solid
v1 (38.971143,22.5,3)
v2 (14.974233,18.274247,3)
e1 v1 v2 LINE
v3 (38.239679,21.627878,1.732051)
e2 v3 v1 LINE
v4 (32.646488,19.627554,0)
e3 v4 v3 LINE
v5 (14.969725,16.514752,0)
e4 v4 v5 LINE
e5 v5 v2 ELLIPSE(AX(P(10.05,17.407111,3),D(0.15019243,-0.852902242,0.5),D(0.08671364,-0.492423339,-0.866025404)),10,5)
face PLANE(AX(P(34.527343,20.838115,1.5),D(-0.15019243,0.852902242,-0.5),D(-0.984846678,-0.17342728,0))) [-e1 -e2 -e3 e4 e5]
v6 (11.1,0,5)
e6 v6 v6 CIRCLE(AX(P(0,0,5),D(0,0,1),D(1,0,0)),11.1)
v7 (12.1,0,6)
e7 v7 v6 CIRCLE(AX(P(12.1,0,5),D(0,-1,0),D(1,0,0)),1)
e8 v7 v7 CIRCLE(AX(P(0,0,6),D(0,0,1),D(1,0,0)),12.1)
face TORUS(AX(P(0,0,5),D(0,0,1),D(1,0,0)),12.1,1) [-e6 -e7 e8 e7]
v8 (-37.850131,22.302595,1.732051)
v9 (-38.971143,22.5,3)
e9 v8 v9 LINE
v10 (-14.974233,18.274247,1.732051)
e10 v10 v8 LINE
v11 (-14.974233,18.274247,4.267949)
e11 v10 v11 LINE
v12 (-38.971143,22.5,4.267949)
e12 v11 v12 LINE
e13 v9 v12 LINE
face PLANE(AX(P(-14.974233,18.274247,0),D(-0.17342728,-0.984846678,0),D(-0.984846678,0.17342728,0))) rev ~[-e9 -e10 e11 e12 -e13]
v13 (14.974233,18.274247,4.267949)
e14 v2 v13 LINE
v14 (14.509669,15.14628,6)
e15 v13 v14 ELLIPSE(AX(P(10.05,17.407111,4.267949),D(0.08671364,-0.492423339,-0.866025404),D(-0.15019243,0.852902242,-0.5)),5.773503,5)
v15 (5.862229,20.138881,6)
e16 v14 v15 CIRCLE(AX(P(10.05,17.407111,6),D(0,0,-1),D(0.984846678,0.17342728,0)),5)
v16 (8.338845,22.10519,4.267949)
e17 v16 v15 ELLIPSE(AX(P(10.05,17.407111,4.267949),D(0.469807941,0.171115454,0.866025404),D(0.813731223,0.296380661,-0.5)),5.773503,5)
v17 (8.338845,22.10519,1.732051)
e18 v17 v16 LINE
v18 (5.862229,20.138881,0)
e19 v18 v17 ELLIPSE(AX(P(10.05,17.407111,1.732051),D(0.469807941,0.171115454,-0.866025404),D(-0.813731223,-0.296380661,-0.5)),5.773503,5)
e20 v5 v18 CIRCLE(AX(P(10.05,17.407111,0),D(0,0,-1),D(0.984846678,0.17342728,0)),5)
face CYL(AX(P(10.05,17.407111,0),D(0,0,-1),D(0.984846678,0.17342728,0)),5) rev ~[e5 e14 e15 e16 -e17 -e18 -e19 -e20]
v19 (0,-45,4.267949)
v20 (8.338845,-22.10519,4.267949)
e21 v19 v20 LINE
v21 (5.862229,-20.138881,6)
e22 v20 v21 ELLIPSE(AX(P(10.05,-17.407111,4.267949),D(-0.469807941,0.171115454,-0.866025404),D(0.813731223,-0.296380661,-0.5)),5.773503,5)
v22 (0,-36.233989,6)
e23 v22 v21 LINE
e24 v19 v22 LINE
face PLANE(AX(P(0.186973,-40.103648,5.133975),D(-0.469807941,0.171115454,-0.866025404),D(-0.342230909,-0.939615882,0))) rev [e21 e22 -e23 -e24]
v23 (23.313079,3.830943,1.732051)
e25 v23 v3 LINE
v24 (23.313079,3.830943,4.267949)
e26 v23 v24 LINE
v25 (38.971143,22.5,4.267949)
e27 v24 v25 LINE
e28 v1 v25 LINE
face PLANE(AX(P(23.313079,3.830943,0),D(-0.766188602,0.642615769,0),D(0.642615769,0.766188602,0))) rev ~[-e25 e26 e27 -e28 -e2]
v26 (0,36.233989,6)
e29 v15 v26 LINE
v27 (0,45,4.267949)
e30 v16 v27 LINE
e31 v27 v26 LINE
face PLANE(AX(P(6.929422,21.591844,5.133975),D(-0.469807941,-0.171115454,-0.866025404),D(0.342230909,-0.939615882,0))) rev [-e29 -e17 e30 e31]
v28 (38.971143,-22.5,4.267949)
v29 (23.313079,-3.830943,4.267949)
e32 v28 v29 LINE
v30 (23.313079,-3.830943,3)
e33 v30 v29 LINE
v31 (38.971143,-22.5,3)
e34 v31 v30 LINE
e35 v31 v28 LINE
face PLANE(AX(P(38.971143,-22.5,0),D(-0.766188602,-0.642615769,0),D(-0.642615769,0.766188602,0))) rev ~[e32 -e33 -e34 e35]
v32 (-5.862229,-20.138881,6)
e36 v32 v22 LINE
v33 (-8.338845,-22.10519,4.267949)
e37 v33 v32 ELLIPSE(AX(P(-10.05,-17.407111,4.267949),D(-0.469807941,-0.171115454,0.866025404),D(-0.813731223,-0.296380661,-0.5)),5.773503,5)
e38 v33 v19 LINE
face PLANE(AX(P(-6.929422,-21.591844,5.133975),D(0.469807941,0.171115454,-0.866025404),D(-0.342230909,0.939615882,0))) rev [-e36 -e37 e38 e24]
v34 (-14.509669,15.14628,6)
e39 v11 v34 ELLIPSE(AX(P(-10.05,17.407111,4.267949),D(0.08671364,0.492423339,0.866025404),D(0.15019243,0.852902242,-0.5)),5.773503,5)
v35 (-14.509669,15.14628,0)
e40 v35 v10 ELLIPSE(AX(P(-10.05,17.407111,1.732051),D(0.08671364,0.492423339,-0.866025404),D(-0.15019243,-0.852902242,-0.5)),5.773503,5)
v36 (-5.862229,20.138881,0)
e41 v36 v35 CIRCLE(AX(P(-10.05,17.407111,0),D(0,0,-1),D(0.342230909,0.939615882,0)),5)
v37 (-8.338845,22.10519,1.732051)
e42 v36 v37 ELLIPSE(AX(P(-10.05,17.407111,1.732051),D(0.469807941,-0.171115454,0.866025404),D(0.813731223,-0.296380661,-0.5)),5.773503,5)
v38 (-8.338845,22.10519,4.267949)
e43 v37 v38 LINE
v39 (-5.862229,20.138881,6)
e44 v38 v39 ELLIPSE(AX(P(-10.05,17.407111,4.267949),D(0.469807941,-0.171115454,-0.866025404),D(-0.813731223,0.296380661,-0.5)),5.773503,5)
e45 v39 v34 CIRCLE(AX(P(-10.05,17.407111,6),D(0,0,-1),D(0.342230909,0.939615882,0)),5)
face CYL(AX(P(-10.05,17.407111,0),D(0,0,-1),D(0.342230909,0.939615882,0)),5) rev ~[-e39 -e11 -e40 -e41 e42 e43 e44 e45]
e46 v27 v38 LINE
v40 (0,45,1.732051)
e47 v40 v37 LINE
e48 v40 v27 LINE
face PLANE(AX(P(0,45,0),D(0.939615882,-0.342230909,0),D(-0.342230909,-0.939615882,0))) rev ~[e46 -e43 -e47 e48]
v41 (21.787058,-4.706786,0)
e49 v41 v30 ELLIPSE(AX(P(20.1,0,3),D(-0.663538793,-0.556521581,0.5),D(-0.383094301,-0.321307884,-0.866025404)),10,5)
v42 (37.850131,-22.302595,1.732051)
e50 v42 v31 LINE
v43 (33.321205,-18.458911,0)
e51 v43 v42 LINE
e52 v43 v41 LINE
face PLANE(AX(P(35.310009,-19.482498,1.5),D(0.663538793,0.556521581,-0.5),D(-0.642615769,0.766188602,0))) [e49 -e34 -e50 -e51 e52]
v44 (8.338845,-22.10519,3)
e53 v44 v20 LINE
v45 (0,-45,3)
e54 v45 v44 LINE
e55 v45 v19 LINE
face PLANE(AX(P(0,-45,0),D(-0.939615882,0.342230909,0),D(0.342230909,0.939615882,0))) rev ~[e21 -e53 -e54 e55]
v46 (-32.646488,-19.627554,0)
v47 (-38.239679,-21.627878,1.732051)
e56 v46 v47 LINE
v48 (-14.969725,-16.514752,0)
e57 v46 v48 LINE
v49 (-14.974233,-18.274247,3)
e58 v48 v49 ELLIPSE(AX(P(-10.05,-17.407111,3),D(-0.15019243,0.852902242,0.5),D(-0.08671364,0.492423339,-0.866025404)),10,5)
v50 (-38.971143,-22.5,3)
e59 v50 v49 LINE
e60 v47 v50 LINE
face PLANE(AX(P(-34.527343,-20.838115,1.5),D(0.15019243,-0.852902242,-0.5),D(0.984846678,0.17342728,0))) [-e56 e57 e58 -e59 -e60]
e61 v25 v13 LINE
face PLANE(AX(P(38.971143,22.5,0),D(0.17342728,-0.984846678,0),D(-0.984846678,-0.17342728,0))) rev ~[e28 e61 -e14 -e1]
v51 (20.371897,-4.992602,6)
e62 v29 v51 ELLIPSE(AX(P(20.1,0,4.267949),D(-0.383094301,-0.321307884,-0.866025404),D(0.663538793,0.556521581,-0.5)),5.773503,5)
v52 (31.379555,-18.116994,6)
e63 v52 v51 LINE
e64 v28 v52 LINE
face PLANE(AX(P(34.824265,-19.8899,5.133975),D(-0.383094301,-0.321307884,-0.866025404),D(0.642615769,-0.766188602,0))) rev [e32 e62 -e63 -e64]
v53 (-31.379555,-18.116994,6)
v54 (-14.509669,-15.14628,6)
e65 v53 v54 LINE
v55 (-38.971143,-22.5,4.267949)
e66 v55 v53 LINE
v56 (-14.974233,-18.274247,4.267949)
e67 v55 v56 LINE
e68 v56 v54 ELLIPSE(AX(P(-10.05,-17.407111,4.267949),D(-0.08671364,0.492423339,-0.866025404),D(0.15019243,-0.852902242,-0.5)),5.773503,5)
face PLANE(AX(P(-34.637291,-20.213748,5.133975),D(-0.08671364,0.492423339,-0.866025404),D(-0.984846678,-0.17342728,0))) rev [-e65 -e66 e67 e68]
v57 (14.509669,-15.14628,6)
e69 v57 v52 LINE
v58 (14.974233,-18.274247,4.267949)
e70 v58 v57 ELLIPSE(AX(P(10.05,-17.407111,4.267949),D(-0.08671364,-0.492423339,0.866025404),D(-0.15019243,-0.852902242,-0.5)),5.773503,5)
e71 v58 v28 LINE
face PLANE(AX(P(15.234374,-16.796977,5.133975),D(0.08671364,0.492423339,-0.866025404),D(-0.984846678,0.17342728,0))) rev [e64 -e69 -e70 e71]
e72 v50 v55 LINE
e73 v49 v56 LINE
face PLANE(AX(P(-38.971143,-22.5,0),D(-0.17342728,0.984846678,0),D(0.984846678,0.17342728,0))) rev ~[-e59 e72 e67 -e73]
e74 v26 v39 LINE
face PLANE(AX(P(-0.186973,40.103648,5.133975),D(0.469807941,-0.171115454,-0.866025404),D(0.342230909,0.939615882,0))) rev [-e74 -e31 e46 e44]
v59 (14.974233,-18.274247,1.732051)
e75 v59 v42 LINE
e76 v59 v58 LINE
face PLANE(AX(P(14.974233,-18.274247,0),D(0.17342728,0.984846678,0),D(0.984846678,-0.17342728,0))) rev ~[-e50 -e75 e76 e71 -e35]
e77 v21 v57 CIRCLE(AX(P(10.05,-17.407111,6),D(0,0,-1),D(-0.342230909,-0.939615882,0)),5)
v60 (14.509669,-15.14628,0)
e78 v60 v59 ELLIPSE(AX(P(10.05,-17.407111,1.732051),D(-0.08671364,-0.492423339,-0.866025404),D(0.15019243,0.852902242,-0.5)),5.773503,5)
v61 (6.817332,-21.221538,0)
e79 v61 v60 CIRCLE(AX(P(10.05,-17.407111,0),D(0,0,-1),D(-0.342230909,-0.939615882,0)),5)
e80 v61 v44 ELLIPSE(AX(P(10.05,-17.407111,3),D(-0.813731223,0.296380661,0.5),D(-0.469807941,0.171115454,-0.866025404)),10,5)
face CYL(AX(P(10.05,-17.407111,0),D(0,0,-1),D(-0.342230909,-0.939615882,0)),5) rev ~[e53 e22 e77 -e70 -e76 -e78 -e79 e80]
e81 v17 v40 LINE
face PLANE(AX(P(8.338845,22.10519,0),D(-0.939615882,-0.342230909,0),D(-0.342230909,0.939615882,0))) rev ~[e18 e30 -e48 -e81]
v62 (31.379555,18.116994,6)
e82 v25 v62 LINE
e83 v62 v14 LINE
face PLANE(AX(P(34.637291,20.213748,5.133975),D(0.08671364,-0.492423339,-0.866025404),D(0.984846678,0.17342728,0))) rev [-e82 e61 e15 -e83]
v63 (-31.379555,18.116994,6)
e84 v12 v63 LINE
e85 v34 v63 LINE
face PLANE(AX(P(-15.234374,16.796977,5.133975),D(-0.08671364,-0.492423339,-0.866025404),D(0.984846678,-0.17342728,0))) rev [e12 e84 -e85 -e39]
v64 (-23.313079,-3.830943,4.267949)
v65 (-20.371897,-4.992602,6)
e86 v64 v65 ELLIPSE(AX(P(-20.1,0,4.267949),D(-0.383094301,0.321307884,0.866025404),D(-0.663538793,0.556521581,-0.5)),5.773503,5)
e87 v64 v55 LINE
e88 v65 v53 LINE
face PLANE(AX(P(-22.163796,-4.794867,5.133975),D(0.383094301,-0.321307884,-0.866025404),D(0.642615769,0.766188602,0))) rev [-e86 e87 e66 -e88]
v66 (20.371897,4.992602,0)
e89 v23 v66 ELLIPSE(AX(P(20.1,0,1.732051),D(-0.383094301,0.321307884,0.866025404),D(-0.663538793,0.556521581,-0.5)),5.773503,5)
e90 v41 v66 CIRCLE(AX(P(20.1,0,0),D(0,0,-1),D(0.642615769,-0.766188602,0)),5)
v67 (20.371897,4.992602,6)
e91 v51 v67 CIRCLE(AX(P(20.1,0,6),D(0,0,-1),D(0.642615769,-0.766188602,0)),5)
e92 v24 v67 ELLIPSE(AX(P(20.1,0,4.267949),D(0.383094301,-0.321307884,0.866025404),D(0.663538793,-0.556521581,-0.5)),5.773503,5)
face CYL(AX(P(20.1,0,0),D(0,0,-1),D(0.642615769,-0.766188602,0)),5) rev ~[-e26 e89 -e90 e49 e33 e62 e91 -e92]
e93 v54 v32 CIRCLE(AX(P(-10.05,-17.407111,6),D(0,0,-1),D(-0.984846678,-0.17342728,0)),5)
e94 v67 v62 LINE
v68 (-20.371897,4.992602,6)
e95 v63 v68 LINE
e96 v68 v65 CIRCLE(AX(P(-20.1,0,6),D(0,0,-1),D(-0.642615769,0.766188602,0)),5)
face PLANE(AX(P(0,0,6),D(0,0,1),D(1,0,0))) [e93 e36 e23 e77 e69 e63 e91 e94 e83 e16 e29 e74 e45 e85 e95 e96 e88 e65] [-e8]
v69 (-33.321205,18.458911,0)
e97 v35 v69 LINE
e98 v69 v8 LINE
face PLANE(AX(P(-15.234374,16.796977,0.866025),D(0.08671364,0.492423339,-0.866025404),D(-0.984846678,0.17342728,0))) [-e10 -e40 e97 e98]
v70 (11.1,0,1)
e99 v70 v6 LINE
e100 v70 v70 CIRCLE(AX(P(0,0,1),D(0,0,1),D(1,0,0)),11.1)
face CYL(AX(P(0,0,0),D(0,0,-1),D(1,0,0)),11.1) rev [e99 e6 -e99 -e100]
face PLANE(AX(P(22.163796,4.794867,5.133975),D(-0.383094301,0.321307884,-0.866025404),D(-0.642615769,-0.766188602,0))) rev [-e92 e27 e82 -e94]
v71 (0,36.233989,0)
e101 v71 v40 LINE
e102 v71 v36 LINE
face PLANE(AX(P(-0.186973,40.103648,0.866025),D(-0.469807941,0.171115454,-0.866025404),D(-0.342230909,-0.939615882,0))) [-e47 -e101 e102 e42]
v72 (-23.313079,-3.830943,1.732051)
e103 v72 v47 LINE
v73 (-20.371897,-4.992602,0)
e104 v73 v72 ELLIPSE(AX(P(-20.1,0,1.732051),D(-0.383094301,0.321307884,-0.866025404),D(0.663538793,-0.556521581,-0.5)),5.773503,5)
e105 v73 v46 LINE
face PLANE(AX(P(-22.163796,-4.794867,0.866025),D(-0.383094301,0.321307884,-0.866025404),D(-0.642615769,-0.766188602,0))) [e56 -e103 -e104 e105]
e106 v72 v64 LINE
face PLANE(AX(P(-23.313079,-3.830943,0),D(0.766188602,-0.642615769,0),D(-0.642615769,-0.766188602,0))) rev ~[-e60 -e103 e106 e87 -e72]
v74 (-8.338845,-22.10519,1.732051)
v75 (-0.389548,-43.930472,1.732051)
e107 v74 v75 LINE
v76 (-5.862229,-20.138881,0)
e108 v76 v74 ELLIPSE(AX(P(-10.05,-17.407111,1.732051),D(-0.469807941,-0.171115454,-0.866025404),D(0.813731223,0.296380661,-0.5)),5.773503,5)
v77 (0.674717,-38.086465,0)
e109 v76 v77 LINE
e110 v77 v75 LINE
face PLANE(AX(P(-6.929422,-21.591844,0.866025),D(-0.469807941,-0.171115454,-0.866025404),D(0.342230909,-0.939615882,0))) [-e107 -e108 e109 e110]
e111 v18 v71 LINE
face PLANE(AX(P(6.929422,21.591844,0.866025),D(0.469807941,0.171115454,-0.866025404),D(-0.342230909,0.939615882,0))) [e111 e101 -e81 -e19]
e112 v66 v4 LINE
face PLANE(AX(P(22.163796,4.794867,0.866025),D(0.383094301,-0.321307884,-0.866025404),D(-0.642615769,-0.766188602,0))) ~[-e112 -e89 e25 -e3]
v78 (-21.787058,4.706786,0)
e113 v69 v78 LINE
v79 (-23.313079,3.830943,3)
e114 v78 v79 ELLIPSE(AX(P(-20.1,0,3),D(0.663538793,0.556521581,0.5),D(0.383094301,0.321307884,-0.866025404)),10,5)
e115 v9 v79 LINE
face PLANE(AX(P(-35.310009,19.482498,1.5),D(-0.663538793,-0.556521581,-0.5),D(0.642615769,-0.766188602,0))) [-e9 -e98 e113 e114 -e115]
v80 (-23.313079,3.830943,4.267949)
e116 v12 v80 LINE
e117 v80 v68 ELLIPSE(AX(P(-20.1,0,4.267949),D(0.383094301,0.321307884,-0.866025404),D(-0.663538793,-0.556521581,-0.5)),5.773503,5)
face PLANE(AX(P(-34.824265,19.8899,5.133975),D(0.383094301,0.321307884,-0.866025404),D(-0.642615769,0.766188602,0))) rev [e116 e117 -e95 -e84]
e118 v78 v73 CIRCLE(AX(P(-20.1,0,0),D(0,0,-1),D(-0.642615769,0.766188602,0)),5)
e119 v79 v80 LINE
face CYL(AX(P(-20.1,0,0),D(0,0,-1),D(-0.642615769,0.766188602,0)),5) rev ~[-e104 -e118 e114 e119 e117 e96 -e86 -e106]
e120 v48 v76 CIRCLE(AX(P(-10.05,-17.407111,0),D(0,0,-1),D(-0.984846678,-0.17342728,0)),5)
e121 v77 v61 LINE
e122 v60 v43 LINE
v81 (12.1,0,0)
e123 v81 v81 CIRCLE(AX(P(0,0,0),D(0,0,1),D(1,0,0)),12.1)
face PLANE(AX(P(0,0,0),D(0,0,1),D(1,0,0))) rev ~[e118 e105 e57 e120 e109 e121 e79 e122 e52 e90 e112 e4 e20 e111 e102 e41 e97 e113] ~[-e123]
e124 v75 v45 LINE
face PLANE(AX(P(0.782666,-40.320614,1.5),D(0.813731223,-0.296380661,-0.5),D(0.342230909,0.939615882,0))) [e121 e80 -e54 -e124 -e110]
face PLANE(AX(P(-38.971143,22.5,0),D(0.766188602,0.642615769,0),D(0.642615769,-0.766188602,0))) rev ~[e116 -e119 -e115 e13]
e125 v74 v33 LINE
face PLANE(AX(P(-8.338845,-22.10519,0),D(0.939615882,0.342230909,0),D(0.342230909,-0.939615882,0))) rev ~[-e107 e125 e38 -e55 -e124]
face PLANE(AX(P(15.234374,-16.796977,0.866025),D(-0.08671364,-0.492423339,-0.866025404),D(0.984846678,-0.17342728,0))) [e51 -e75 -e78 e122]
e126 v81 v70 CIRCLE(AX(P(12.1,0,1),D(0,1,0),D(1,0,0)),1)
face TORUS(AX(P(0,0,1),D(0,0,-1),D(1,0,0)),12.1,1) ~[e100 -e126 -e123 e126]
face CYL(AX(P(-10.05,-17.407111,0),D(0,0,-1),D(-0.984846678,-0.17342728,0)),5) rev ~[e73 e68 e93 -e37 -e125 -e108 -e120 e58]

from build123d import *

# Parameters (mm, degrees)
F0_R         = 11.1
F1_DEPTH     = 6
F2_C1_SIZE2  = 3
F2_C1_SIZE   = 1.7320508076
F2_C2_SIZE2  = 3
F2_C2_SIZE   = 1.7320508076
F2_C3_SIZE2  = 3
F2_C3_SIZE   = 1.7320508076
F2_C4_SIZE2  = 3
F2_C4_SIZE   = 1.7320508076
F2_C5_SIZE2  = 1.7320508076
F2_C5_SIZE   = 3
F2_C6_SIZE2  = 3
F2_C6_SIZE   = 1.7320508076
F2_C7_SIZE2  = 1.7320508076
F2_C7_SIZE   = 3
F2_C8_SIZE2  = 3
F2_C8_SIZE   = 1.7320508076
F2_C9_SIZE2  = 1.7320508076
F2_C9_SIZE   = 3
F2_C10_SIZE2 = 3
F2_C10_SIZE  = 1.7320508076
F2_C11_SIZE2 = 3
F2_C11_SIZE  = 1.7320508076
F2_C12_SIZE2 = 3
F2_C12_SIZE  = 1.7320508076
F2_C13_SIZE2 = 1.7320508076
F2_C13_SIZE  = 3
F2_C14_SIZE2 = 3
F2_C14_SIZE  = 1.7320508076
F2_C15_SIZE2 = 3
F2_C15_SIZE  = 1.7320508076
F2_C16_SIZE2 = 3
F2_C16_SIZE  = 1.7320508076
F2_C17_SIZE2 = 1.7320508076
F2_C17_SIZE  = 3
F2_C18_SIZE2 = 3
F2_C18_SIZE  = 1.7320508076
F2_C19_SIZE2 = 3
F2_C19_SIZE  = 1.7320508076
F2_C20_SIZE2 = 3
F2_C20_SIZE  = 1.7320508076
F2_C21_SIZE2 = 1.7320508076
F2_C21_SIZE  = 3
F2_C22_SIZE2 = 3
F2_C22_SIZE  = 1.7320508076
F2_C23_SIZE2 = 3
F2_C23_SIZE  = 1.7320508076
F2_C24_SIZE2 = 3
F2_C24_SIZE  = 1.7320508076
F3_R         = 1


with BuildPart() as f1:
    # F0 (on Top) → F1 (new body)
    with BuildSketch(Plane.XY):
        with BuildLine():
            Line((8.3388454559, 22.1051900243), (0, 45))
            Line((0, 45), (-8.3388454559, 22.1051900243))
            ThreePointArc((-8.3388454559, 22.1051900243), (-7.55, 13.0769835971), (-14.9742333886, 18.2742470152))
            Line((-14.9742333886, 18.2742470152), (-38.9711431703, 22.5))
            Line((-38.9711431703, 22.5), (-23.3130788445, 3.8309430091))
            ThreePointArc((-23.3130788445, 3.8309430091), (-15.1, 0), (-23.3130788445, -3.8309430091))
            Line((-23.3130788445, -3.8309430091), (-38.9711431703, -22.5))
            Line((-38.9711431703, -22.5), (-14.9742333886, -18.2742470152))
            ThreePointArc((-14.9742333886, -18.2742470152), (-7.55, -13.0769835971), (-8.3388454559, -22.1051900243))
            Line((-8.3388454559, -22.1051900243), (0, -45))
            Line((0, -45), (8.3388454559, -22.1051900243))
            ThreePointArc((8.3388454559, -22.1051900243), (7.55, -13.0769835971), (14.9742333886, -18.2742470152))
            Line((14.9742333886, -18.2742470152), (38.9711431703, -22.5))
            Line((38.9711431703, -22.5), (23.3130788445, -3.8309430091))
            ThreePointArc((23.3130788445, -3.8309430091), (15.1, 0), (23.3130788445, 3.8309430091))
            Line((23.3130788445, 3.8309430091), (38.9711431703, 22.5))
            Line((38.9711431703, 22.5), (14.9742333886, 18.2742470152))
            ThreePointArc((14.9742333886, 18.2742470152), (7.55, 13.0769835971), (8.3388454559, 22.1051900243))
        make_face()
        Circle(F0_R, mode=Mode.SUBTRACT)
    extrude(amount=F1_DEPTH)

    # F2: chamfer of 3 x 1.7320508076 on 24 edges, made by hand

    # F2_c1
    f2_c1_edges = [f1.edges().sort_by_distance(p)[0] for p in [
        (31.1421110074, 13.1654715045, 0),
    ]]
    f2_c1_side = f1.faces().sort_by_distance((31.1421110074, 13.1654715045, 0.0346410162))[0]
    chamfer(f2_c1_edges, length=F2_C1_SIZE, length2=F2_C1_SIZE2, reference=f2_c1_side)

    # F2_c2
    f2_c2_edges = [f1.edges().sort_by_distance(p)[0] for p in [
        (31.1421110074, 13.1654715045, 6),
    ]]
    f2_c2_side = f1.faces().sort_by_distance((31.1421110074, 13.1654715045, 5.9653589838))[0]
    chamfer(f2_c2_edges, length=F2_C2_SIZE, length2=F2_C2_SIZE2, reference=f2_c2_side)

    # F2_c3
    f2_c3_edges = [f1.edges().sort_by_distance(p)[0] for p in [
        (24.6756919125, 19.9826322901, 0),
    ]]
    f2_c3_side = f1.faces().sort_by_distance((24.6816996097, 19.9485162005, 0))[0]
    chamfer(f2_c3_edges, length=F2_C3_SIZE, length2=F2_C3_SIZE2, reference=f2_c3_side)

    # F2_c4
    f2_c4_edges = [f1.edges().sort_by_distance(p)[0] for p in [
        (24.6756919125, 19.9826322901, 6),
    ]]
    f2_c4_side = f1.faces().sort_by_distance((24.6756919125, 19.9826322901, 5.9653589838))[0]
    chamfer(f2_c4_edges, length=F2_C4_SIZE, length2=F2_C4_SIZE2, reference=f2_c4_side)

    # F2_c5
    f2_c5_edges = [f1.edges().sort_by_distance(p)[0] for p in [
        (4.169422728, 33.5525950122, 0),
    ]]
    f2_c5_side = f1.faces().sort_by_distance((4.136873479, 33.5407397857, 0))[0]
    chamfer(f2_c5_edges, length=F2_C5_SIZE, length2=F2_C5_SIZE2, reference=f2_c5_side)

    # F2_c6
    f2_c6_edges = [f1.edges().sort_by_distance(p)[0] for p in [
        (4.169422728, 33.5525950122, 6),
    ]]
    f2_c6_side = f1.faces().sort_by_distance((4.169422728, 33.5525950122, 5.9653589838))[0]
    chamfer(f2_c6_edges, length=F2_C6_SIZE, length2=F2_C6_SIZE2, reference=f2_c6_side)

    # F2_c7
    f2_c7_edges = [f1.edges().sort_by_distance(p)[0] for p in [
        (-4.9676212415, 31.3610921973, 0),
    ]]
    f2_c7_side = f1.faces().sort_by_distance((-4.9350719925, 31.3492369708, 0))[0]
    chamfer(f2_c7_edges, length=F2_C7_SIZE, length2=F2_C7_SIZE2, reference=f2_c7_side)

    # F2_c8
    f2_c8_edges = [f1.edges().sort_by_distance(p)[0] for p in [
        (-4.9676212415, 31.3610921973, 6),
    ]]
    f2_c8_side = f1.faces().sort_by_distance((-4.9676212415, 31.3610921973, 5.9653589838))[0]
    chamfer(f2_c8_edges, length=F2_C8_SIZE, length2=F2_C8_SIZE2, reference=f2_c8_side)

    # F2_c9
    f2_c9_edges = [f1.edges().sort_by_distance(p)[0] for p in [
        (-26.9726882794, 20.3871235076, 0),
    ]]
    f2_c9_side = f1.faces().sort_by_distance((-26.9786959766, 20.353007418, 0))[0]
    chamfer(f2_c9_edges, length=F2_C9_SIZE, length2=F2_C9_SIZE2, reference=f2_c9_side)

    # F2_c10
    f2_c10_edges = [f1.edges().sort_by_distance(p)[0] for p in [
        (-26.9726882794, 20.3871235076, 6),
    ]]
    f2_c10_side = f1.faces().sort_by_distance((-26.9726882794, 20.3871235076, 5.9653589838))[0]
    chamfer(f2_c10_edges, length=F2_C10_SIZE, length2=F2_C10_SIZE2, reference=f2_c10_side)

    # F2_c11
    f2_c11_edges = [f1.edges().sort_by_distance(p)[0] for p in [
        (-29.643313154, 11.3784599071, 0),
    ]]
    f2_c11_side = f1.faces().sort_by_distance((-29.6167716023, 11.4007207704, 0))[0]
    chamfer(f2_c11_edges, length=F2_C11_SIZE, length2=F2_C11_SIZE2, reference=f2_c11_side)

    # F2_c12
    f2_c12_edges = [f1.edges().sort_by_distance(p)[0] for p in [
        (-29.643313154, 11.3784599071, 6),
    ]]
    f2_c12_side = f1.faces().sort_by_distance((-29.643313154, 11.3784599071, 5.9653589838))[0]
    chamfer(f2_c12_edges, length=F2_C12_SIZE, length2=F2_C12_SIZE2, reference=f2_c12_side)

    # F2_c13
    f2_c13_edges = [f1.edges().sort_by_distance(p)[0] for p in [
        (-31.1421110074, -13.1654715045, 0),
    ]]
    f2_c13_side = f1.faces().sort_by_distance((-31.1155694557, -13.1877323678, 0))[0]
    chamfer(f2_c13_edges, length=F2_C13_SIZE, length2=F2_C13_SIZE2, reference=f2_c13_side)

    # F2_c14
    f2_c14_edges = [f1.edges().sort_by_distance(p)[0] for p in [
        (-31.1421110074, -13.1654715045, 6),
    ]]
    f2_c14_side = f1.faces().sort_by_distance((-31.1421110074, -13.1654715045, 5.9653589838))[0]
    chamfer(f2_c14_edges, length=F2_C14_SIZE, length2=F2_C14_SIZE2, reference=f2_c14_side)

    # F2_c15
    f2_c15_edges = [f1.edges().sort_by_distance(p)[0] for p in [
        (-24.6756919125, -19.9826322901, 0),
    ]]
    f2_c15_side = f1.faces().sort_by_distance((-24.6816996097, -19.9485162005, 0))[0]
    chamfer(f2_c15_edges, length=F2_C15_SIZE, length2=F2_C15_SIZE2, reference=f2_c15_side)

    # F2_c16
    f2_c16_edges = [f1.edges().sort_by_distance(p)[0] for p in [
        (-24.6756919125, -19.9826322901, 6),
    ]]
    f2_c16_side = f1.faces().sort_by_distance((-24.6756919125, -19.9826322901, 5.9653589838))[0]
    chamfer(f2_c16_edges, length=F2_C16_SIZE, length2=F2_C16_SIZE2, reference=f2_c16_side)

    # F2_c17
    f2_c17_edges = [f1.edges().sort_by_distance(p)[0] for p in [
        (-4.169422728, -33.5525950122, 0),
    ]]
    f2_c17_side = f1.faces().sort_by_distance((-4.136873479, -33.5407397857, 0))[0]
    chamfer(f2_c17_edges, length=F2_C17_SIZE, length2=F2_C17_SIZE2, reference=f2_c17_side)

    # F2_c18
    f2_c18_edges = [f1.edges().sort_by_distance(p)[0] for p in [
        (-4.169422728, -33.5525950122, 6),
    ]]
    f2_c18_side = f1.faces().sort_by_distance((-4.169422728, -33.5525950122, 5.9653589838))[0]
    chamfer(f2_c18_edges, length=F2_C18_SIZE, length2=F2_C18_SIZE2, reference=f2_c18_side)

    # F2_c19
    f2_c19_edges = [f1.edges().sort_by_distance(p)[0] for p in [
        (4.9676212415, -31.3610921973, 0),
    ]]
    f2_c19_side = f1.faces().sort_by_distance((4.9350719925, -31.3492369708, 0))[0]
    chamfer(f2_c19_edges, length=F2_C19_SIZE, length2=F2_C19_SIZE2, reference=f2_c19_side)

    # F2_c20
    f2_c20_edges = [f1.edges().sort_by_distance(p)[0] for p in [
        (4.9676212415, -31.3610921973, 6),
    ]]
    f2_c20_side = f1.faces().sort_by_distance((4.9676212415, -31.3610921973, 5.9653589838))[0]
    chamfer(f2_c20_edges, length=F2_C20_SIZE, length2=F2_C20_SIZE2, reference=f2_c20_side)

    # F2_c21
    f2_c21_edges = [f1.edges().sort_by_distance(p)[0] for p in [
        (26.9726882794, -20.3871235076, 0),
    ]]
    f2_c21_side = f1.faces().sort_by_distance((26.9786959766, -20.353007418, 0))[0]
    chamfer(f2_c21_edges, length=F2_C21_SIZE, length2=F2_C21_SIZE2, reference=f2_c21_side)

    # F2_c22
    f2_c22_edges = [f1.edges().sort_by_distance(p)[0] for p in [
        (26.9726882794, -20.3871235076, 6),
    ]]
    f2_c22_side = f1.faces().sort_by_distance((26.9726882794, -20.3871235076, 5.9653589838))[0]
    chamfer(f2_c22_edges, length=F2_C22_SIZE, length2=F2_C22_SIZE2, reference=f2_c22_side)

    # F2_c23
    f2_c23_edges = [f1.edges().sort_by_distance(p)[0] for p in [
        (29.643313154, -11.3784599071, 0),
    ]]
    f2_c23_side = f1.faces().sort_by_distance((29.6167716023, -11.4007207704, 0))[0]
    chamfer(f2_c23_edges, length=F2_C23_SIZE, length2=F2_C23_SIZE2, reference=f2_c23_side)

    # F2_c24
    f2_c24_edges = [f1.edges().sort_by_distance(p)[0] for p in [
        (29.643313154, -11.3784599071, 6),
    ]]
    f2_c24_side = f1.faces().sort_by_distance((29.643313154, -11.3784599071, 5.9653589838))[0]
    chamfer(f2_c24_edges, length=F2_C24_SIZE, length2=F2_C24_SIZE2, reference=f2_c24_side)

    # F3
    f3_edges = [f1.edges().sort_by_distance(p)[0] for p in [
        (-11.1, 0, 0),
        (-11.1, 0, 6),
    ]]
    fillet(f3_edges, radius=F3_R)


solid = f1.part
